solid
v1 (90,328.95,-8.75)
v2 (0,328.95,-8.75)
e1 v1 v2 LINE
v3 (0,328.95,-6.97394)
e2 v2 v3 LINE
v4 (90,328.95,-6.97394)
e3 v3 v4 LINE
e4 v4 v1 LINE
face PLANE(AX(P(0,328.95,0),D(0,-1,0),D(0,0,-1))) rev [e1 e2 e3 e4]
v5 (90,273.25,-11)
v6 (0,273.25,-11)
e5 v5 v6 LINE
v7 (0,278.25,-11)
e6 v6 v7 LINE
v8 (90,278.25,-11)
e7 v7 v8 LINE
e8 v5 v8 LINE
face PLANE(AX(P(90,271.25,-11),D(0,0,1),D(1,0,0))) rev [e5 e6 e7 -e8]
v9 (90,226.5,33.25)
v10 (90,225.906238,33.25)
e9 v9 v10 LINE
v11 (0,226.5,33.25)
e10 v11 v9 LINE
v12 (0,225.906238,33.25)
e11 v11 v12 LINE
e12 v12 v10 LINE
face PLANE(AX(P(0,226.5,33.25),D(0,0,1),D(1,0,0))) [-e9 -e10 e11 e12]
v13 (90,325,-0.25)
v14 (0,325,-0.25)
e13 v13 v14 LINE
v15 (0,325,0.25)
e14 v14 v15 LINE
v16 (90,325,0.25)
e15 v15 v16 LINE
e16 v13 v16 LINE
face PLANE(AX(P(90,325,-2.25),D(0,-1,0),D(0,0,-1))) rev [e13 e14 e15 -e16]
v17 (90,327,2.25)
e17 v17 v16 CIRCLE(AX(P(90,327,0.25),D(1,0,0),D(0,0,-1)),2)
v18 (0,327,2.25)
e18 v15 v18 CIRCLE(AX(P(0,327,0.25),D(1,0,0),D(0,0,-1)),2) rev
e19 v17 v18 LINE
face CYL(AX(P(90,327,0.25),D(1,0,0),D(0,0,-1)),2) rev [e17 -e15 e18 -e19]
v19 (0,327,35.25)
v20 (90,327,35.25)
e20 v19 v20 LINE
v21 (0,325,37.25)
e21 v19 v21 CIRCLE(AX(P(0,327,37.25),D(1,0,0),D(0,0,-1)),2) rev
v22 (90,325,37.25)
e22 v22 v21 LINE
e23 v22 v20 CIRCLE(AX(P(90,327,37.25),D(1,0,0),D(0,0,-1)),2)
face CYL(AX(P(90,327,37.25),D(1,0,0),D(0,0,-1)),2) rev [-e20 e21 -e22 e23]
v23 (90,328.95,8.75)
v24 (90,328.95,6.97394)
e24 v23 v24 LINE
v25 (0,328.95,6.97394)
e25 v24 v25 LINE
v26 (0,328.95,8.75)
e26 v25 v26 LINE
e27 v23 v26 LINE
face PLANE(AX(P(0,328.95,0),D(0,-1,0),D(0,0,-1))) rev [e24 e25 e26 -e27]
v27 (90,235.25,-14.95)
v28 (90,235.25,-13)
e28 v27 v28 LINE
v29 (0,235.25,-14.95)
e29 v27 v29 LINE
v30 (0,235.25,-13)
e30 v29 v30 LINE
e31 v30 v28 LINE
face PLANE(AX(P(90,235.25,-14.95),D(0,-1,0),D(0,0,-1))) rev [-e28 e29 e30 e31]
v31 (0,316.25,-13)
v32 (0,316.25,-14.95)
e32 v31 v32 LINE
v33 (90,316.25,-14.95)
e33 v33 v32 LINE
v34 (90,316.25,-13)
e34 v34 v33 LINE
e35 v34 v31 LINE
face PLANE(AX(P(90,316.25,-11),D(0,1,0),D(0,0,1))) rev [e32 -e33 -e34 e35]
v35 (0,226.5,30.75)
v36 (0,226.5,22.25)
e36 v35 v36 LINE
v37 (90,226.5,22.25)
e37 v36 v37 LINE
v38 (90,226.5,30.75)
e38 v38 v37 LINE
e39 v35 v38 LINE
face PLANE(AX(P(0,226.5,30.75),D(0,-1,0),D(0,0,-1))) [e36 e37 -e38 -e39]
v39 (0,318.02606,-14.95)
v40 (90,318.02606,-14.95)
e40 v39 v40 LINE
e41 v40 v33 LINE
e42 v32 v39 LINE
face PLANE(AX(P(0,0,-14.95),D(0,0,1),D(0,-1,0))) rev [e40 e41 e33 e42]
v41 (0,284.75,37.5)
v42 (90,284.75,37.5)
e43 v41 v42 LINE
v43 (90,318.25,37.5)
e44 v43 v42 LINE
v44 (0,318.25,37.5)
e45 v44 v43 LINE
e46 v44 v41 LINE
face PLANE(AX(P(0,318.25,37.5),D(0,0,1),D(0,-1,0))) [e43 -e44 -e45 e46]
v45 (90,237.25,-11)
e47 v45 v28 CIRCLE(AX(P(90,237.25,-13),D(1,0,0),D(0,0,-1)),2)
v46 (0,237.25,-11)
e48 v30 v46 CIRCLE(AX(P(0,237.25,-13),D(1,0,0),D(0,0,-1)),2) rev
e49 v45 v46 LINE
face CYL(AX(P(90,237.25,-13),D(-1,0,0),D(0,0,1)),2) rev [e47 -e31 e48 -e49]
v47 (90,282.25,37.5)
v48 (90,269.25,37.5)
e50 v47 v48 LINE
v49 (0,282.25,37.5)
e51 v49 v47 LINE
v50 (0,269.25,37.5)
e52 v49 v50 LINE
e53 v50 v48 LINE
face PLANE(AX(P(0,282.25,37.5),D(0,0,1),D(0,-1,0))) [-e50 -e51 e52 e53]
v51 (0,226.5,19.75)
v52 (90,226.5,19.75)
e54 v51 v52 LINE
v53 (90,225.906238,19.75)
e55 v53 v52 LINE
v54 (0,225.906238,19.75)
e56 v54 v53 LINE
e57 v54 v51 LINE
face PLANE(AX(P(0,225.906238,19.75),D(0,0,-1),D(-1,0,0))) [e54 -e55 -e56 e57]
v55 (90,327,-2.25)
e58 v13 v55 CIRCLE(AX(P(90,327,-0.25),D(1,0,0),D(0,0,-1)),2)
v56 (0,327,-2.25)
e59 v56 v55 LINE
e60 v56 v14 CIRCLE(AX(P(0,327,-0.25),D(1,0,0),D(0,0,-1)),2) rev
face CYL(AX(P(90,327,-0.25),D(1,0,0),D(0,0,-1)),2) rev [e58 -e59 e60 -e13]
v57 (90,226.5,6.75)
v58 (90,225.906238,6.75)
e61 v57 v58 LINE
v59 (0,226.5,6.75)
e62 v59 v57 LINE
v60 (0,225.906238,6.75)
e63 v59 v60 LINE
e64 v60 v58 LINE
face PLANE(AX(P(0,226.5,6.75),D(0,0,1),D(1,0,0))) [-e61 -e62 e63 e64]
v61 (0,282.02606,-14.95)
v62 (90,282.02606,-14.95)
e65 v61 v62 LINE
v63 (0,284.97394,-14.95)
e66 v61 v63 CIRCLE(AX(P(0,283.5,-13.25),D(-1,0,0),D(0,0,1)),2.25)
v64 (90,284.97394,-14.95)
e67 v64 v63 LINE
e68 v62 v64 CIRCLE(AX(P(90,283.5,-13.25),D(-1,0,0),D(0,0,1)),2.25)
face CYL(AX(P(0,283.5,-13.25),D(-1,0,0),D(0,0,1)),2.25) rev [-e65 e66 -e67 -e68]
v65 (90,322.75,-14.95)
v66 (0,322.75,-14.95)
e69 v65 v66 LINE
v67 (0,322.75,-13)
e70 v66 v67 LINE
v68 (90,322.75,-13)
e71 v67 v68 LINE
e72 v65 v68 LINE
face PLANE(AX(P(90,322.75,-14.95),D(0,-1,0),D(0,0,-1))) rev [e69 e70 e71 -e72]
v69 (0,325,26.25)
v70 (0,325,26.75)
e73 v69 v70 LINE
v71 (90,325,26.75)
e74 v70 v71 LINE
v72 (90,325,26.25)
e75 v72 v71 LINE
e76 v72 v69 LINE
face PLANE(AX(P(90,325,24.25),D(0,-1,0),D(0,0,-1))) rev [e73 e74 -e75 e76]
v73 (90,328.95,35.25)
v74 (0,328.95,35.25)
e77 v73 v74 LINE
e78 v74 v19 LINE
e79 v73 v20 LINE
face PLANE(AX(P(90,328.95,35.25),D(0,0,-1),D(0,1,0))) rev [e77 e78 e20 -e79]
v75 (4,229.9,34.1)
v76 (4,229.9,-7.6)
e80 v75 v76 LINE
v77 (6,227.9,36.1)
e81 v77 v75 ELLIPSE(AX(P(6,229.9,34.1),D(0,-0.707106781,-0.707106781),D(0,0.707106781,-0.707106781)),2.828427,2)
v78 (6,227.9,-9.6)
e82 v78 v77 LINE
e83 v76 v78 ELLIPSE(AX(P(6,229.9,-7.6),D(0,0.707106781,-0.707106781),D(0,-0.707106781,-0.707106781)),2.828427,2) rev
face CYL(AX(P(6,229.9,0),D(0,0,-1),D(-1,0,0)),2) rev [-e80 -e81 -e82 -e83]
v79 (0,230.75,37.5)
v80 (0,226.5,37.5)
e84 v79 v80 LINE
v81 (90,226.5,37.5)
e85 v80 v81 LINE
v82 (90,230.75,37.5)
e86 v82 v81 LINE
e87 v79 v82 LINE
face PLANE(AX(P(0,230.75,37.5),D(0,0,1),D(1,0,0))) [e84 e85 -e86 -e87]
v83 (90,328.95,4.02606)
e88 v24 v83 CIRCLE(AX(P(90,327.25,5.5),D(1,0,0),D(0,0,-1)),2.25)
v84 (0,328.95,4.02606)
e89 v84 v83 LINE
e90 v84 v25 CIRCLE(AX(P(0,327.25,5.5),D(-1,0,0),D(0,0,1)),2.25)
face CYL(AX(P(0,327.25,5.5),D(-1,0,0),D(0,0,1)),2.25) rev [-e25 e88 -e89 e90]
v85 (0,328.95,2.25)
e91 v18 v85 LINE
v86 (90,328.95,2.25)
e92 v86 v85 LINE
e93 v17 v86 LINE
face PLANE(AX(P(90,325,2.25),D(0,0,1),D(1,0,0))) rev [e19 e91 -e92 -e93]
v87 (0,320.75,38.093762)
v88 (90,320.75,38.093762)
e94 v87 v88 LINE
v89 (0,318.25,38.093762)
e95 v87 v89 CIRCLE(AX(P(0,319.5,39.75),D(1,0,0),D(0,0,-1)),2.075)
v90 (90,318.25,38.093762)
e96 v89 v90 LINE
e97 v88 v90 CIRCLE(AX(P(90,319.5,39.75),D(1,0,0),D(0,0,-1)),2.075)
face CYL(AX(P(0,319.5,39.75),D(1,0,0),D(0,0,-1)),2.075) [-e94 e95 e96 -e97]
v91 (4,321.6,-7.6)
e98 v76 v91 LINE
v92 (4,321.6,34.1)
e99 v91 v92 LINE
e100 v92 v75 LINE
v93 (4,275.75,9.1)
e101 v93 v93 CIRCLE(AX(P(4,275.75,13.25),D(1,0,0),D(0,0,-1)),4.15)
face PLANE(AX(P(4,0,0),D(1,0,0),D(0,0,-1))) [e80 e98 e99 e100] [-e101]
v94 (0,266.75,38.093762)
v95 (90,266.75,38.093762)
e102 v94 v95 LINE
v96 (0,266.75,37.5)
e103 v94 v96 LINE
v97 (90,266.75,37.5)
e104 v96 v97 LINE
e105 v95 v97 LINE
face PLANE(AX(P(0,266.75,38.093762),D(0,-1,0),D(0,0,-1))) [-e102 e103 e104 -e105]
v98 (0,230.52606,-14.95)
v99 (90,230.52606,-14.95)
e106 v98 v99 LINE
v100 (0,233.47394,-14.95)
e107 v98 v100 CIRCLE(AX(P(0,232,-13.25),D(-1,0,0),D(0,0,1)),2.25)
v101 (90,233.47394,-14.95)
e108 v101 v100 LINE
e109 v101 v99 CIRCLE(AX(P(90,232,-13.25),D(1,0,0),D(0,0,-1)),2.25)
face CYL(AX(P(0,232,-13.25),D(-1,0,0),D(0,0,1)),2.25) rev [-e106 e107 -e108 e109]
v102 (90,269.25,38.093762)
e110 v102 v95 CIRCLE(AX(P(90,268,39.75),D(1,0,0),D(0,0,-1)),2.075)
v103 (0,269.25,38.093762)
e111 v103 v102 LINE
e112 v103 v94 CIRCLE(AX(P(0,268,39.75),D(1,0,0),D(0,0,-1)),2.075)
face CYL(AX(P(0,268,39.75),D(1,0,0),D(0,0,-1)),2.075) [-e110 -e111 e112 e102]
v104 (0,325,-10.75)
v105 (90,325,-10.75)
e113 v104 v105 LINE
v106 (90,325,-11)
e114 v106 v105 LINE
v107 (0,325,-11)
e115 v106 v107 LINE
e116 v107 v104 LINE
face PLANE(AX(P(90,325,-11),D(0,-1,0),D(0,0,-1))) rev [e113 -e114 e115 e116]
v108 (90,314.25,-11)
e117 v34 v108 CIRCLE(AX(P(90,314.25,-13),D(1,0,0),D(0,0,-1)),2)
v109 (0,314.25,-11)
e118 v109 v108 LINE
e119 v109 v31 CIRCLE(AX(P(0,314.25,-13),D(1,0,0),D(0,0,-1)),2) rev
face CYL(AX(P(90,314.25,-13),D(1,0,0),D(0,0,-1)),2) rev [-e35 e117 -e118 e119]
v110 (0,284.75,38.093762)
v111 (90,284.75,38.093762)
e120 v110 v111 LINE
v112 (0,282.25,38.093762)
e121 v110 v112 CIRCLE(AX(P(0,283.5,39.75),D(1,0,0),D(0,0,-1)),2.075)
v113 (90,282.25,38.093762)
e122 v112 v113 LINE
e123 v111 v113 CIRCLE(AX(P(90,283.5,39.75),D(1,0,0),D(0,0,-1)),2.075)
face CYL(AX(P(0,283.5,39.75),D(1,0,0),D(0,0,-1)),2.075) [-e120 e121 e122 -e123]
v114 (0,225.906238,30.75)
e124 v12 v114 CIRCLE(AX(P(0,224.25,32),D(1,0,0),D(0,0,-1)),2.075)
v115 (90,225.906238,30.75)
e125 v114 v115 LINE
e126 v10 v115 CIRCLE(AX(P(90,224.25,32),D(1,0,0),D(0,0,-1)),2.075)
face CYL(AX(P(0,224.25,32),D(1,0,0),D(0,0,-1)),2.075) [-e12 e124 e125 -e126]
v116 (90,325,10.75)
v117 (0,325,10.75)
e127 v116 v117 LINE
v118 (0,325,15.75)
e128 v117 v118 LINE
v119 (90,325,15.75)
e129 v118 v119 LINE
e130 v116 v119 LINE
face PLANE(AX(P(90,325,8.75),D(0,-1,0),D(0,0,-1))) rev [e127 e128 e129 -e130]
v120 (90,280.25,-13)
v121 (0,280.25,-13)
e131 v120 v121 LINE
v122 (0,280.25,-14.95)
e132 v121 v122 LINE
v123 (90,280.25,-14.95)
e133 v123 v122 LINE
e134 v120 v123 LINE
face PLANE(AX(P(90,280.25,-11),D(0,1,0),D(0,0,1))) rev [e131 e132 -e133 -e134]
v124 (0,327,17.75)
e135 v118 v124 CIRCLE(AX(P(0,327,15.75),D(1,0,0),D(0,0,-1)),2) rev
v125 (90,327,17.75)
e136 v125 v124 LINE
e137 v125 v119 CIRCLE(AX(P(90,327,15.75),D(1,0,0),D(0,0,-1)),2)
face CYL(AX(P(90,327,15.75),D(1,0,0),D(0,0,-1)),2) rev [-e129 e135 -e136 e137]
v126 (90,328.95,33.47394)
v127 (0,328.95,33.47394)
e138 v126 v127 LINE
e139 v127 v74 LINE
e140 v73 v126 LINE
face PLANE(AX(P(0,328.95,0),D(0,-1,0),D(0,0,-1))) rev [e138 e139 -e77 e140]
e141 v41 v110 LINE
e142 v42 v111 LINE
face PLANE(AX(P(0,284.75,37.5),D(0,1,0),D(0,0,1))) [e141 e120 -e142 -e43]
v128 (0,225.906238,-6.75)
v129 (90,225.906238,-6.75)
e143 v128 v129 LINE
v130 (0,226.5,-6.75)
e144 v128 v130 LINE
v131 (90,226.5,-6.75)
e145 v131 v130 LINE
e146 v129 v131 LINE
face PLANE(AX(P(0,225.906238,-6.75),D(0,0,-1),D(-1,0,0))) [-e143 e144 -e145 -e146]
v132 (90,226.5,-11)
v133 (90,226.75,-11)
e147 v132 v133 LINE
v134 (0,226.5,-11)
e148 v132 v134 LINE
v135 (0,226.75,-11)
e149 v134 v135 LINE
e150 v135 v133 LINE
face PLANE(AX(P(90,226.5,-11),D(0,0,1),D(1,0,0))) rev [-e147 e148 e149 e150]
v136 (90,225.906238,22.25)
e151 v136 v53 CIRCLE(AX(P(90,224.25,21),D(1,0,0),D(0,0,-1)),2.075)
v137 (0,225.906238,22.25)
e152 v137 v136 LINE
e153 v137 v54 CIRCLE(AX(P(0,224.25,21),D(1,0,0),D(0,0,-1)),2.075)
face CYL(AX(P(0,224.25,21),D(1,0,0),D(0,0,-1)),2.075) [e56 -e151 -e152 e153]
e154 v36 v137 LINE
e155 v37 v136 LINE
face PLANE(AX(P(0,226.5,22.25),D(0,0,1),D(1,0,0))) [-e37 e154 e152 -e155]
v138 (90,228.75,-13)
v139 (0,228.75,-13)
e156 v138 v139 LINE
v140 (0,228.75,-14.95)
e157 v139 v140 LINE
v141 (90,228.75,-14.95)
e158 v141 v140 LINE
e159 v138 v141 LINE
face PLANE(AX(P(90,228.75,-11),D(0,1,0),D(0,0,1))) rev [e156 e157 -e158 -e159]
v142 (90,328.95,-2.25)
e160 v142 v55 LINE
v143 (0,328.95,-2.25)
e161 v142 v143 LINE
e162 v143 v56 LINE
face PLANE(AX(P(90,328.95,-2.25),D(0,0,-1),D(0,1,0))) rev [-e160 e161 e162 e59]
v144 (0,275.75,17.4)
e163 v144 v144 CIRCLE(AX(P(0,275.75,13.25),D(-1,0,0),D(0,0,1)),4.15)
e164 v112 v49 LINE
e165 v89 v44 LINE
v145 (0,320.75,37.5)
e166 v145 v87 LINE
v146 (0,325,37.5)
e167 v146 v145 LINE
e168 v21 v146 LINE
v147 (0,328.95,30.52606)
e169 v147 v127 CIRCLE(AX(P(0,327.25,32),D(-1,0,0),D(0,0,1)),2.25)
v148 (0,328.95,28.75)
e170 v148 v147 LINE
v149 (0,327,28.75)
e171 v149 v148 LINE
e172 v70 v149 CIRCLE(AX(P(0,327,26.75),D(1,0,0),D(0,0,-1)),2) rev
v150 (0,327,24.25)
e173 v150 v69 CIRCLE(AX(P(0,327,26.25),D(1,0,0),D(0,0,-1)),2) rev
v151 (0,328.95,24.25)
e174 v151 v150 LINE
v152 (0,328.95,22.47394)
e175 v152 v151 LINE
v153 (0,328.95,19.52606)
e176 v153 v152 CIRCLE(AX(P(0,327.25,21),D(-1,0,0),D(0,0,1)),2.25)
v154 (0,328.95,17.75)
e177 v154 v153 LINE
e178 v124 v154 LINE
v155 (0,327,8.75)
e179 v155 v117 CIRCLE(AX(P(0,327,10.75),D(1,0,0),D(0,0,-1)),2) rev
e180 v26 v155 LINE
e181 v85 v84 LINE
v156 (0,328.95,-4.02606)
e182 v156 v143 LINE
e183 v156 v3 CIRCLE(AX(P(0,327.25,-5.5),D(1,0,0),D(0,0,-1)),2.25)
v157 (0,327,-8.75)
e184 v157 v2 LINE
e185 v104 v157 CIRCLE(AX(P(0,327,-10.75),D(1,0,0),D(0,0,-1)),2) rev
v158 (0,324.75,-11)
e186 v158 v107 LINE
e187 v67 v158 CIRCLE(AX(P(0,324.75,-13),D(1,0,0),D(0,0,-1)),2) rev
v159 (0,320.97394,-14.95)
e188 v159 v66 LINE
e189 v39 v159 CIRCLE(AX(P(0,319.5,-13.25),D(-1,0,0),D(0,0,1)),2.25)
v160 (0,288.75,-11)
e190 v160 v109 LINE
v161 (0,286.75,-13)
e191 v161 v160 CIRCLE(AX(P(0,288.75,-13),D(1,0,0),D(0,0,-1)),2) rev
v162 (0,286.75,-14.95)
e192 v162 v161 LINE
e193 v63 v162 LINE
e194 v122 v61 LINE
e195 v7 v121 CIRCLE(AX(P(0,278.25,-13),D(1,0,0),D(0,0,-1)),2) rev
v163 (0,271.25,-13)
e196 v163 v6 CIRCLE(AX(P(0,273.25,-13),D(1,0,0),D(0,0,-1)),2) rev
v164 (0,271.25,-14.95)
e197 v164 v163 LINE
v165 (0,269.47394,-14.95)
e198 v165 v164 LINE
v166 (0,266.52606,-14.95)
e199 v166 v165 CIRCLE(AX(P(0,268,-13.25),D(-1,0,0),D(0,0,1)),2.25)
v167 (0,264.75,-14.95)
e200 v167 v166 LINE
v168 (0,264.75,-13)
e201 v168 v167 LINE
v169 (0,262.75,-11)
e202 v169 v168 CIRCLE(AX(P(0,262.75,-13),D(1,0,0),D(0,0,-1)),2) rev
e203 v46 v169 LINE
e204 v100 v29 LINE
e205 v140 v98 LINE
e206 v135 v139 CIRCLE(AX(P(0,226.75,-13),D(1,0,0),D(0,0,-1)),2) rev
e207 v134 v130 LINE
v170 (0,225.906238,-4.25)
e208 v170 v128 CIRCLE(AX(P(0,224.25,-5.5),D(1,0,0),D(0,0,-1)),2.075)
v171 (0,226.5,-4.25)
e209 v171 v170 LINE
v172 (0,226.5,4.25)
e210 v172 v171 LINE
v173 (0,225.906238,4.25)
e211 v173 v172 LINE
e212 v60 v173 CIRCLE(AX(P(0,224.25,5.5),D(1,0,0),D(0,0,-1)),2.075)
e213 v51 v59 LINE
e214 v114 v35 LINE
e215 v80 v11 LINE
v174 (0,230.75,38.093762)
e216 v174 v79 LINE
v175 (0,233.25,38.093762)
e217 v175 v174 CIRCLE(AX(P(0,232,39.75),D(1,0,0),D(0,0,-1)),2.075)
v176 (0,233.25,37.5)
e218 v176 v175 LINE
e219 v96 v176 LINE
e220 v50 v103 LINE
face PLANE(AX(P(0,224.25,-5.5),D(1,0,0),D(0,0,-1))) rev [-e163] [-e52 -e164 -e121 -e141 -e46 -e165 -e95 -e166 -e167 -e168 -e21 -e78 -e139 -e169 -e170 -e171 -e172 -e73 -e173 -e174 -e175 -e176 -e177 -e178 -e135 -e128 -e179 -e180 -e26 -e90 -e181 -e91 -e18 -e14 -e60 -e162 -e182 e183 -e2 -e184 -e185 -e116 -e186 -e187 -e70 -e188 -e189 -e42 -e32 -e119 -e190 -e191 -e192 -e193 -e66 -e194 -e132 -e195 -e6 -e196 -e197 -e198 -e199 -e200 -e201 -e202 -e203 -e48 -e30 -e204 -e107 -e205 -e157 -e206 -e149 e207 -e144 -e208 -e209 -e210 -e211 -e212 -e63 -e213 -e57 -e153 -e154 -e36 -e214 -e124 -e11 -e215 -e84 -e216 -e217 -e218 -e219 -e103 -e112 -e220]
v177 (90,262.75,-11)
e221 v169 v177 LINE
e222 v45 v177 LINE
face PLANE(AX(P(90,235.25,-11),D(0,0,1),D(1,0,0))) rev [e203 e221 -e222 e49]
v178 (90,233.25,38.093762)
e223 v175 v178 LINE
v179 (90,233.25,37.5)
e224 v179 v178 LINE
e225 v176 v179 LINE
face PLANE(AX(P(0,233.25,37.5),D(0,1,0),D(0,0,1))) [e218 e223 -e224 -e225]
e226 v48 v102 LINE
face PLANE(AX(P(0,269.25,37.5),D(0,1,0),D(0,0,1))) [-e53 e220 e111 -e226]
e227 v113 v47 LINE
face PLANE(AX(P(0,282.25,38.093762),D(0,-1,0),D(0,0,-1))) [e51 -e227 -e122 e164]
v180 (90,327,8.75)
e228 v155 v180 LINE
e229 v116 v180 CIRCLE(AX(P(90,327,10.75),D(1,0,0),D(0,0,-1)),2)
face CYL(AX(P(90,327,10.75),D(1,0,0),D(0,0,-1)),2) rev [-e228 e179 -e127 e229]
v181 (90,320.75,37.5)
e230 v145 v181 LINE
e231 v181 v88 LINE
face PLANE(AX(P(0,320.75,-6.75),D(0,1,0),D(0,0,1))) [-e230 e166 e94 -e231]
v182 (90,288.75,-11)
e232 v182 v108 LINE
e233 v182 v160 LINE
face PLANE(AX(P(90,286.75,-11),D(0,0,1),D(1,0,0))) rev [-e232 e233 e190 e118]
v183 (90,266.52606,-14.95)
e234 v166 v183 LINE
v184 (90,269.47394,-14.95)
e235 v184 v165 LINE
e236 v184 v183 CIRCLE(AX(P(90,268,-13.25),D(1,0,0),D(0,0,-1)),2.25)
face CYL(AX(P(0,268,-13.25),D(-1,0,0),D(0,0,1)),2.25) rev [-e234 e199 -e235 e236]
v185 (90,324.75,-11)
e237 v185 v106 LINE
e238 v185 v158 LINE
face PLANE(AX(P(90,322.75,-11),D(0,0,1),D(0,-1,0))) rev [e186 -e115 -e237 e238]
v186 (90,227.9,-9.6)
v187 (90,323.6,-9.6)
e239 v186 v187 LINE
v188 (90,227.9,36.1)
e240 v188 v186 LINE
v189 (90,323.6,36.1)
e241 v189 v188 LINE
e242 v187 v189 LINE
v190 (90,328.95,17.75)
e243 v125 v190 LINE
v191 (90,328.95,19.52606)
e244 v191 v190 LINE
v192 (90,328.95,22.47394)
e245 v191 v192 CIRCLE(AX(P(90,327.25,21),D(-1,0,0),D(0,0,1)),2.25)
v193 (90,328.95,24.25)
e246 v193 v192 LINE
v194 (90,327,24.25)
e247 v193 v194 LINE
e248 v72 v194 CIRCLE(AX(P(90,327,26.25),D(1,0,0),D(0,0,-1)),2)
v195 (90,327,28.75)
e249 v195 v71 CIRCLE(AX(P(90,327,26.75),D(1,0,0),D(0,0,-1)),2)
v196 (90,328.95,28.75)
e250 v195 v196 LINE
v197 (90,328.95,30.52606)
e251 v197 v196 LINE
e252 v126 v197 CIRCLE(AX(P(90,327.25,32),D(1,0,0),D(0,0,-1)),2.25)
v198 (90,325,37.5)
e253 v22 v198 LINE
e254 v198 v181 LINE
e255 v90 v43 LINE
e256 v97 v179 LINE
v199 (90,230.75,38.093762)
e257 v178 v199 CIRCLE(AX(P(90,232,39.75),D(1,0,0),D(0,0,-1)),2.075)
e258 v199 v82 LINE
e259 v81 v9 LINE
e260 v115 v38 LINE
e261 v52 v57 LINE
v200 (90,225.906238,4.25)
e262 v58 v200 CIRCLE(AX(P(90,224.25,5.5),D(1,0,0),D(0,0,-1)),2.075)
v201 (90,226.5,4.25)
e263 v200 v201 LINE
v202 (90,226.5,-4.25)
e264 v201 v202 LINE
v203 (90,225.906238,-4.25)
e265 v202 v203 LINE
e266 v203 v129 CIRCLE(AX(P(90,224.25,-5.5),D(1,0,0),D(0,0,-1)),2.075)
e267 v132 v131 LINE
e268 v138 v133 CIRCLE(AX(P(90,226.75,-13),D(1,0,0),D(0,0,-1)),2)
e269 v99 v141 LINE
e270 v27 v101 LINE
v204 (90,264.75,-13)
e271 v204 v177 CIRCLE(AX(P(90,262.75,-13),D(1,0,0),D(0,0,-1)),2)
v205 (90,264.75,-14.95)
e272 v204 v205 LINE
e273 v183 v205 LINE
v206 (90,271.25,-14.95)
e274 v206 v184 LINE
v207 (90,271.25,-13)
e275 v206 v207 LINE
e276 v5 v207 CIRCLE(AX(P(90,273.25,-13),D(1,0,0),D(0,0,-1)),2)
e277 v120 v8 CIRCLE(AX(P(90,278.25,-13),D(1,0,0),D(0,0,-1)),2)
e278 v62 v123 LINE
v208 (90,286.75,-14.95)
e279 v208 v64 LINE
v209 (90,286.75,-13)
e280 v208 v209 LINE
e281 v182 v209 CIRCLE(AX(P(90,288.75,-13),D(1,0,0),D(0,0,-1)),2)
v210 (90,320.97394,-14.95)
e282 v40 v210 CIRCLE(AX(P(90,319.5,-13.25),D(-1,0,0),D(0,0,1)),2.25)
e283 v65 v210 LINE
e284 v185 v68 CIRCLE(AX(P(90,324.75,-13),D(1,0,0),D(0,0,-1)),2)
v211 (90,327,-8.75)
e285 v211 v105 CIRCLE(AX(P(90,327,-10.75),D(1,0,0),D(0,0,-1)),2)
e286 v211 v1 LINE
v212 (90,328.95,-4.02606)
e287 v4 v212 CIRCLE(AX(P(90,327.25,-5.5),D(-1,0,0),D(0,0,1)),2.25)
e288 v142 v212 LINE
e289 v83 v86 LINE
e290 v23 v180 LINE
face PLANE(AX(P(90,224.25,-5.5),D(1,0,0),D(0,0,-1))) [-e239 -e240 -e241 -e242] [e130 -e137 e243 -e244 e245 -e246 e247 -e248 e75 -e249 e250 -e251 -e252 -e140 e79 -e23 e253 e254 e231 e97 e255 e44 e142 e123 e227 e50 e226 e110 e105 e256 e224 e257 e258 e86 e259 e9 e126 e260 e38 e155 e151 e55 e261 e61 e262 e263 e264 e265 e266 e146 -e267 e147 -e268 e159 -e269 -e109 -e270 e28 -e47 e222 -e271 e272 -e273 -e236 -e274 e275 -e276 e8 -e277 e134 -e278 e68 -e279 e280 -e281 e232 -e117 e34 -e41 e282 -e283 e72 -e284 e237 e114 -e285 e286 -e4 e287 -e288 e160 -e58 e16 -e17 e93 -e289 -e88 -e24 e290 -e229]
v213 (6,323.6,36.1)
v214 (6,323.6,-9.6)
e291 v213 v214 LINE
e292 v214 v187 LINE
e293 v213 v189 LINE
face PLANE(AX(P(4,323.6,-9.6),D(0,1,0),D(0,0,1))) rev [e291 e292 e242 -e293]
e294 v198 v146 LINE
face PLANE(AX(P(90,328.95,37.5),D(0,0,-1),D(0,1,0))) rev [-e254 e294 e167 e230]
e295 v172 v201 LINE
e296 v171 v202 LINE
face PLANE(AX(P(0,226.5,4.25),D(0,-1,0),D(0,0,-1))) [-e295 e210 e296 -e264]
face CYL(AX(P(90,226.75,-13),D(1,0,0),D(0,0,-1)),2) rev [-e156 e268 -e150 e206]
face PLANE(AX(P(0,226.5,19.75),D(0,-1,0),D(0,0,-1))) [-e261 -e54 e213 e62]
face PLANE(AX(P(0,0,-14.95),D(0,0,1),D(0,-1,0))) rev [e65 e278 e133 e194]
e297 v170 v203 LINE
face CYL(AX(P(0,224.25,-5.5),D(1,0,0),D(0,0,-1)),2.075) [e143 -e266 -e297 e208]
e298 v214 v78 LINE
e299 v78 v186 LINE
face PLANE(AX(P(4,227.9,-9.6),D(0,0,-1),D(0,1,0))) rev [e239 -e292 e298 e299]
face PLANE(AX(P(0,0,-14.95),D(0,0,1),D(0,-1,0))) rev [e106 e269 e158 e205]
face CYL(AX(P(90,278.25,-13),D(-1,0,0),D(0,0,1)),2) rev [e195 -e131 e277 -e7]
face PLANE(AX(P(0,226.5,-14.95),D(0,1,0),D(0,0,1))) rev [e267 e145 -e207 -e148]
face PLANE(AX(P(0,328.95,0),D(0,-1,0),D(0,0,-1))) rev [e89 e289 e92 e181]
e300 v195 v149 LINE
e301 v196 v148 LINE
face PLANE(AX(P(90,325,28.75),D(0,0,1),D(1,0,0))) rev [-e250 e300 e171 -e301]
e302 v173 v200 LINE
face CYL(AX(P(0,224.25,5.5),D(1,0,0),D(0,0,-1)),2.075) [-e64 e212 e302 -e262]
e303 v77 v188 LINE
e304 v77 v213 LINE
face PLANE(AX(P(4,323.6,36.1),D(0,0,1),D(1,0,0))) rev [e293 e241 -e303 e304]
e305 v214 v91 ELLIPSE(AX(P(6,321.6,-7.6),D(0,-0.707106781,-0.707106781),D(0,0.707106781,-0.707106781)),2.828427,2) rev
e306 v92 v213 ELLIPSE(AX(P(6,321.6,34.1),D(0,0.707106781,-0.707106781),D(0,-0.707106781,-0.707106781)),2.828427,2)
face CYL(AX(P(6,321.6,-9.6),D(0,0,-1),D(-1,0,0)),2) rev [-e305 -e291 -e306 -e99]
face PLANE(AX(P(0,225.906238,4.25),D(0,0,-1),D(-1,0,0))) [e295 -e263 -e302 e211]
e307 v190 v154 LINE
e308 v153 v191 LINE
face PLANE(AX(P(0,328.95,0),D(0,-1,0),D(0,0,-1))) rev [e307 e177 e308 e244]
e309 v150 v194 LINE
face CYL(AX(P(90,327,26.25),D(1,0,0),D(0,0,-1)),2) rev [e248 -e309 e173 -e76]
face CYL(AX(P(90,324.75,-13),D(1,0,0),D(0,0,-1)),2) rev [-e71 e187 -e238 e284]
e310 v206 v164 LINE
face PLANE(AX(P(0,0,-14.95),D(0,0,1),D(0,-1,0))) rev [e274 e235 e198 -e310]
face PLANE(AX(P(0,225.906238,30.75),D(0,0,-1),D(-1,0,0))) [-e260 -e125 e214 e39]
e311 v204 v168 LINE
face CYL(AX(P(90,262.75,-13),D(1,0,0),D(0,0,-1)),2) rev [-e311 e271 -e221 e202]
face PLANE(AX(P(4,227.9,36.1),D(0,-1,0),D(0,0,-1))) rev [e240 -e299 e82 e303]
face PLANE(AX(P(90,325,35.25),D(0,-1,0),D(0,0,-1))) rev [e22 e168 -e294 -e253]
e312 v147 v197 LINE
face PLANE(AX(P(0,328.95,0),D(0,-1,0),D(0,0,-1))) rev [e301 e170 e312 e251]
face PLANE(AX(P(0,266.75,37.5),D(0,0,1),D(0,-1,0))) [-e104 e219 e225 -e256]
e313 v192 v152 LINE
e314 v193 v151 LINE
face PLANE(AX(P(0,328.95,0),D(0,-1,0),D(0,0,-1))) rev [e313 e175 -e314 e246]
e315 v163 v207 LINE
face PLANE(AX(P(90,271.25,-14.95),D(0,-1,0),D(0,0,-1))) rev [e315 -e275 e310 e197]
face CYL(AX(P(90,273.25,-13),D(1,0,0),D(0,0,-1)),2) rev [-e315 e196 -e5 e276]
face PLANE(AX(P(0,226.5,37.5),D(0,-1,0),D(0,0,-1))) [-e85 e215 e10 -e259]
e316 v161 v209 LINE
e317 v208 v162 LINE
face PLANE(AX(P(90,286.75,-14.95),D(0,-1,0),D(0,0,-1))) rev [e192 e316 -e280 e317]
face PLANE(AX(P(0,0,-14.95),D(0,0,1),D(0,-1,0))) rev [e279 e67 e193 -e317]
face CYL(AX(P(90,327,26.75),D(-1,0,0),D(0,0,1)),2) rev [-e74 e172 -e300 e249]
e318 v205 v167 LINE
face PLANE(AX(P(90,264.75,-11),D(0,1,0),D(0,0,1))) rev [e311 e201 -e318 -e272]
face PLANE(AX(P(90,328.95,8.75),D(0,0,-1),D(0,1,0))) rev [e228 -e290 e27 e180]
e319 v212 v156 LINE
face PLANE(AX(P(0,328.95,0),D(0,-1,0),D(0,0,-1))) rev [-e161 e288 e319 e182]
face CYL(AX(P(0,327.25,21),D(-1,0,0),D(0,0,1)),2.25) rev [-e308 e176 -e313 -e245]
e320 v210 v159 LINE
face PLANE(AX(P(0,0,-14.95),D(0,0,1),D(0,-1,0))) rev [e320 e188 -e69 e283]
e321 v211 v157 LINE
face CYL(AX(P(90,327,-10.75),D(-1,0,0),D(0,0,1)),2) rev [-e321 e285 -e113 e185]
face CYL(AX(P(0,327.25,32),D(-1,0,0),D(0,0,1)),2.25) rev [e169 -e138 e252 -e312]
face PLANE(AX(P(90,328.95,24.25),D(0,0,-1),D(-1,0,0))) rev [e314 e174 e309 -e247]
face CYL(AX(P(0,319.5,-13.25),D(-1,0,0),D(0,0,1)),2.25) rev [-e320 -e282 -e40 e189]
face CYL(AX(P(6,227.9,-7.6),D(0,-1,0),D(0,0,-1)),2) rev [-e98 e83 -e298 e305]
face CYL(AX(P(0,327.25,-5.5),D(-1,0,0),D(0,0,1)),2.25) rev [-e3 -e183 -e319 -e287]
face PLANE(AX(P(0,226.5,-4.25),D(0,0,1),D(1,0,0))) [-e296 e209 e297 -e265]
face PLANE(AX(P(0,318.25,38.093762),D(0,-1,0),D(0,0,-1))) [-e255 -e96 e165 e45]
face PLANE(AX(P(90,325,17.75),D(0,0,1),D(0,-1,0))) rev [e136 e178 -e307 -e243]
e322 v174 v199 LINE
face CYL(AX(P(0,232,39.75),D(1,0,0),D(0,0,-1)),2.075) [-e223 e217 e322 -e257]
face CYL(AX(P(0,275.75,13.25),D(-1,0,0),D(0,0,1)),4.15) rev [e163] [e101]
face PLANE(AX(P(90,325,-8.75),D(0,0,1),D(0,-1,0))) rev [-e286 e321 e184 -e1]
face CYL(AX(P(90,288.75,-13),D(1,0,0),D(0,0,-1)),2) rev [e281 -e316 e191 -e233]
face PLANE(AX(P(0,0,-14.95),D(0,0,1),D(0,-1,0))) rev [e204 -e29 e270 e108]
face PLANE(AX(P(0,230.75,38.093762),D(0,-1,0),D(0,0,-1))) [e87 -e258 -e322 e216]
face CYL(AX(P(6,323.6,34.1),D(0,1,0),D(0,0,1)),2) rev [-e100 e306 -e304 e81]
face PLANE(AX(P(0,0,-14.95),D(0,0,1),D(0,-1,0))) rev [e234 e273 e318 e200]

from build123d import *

# Parameters (mm, degrees)
EXTRUDE_1_DEPTH             = 90
SKETCH_2_W                  = 90
SKETCH_2_H                  = 44.25
EXTRUDE_2_DEPTH             = 8.2
SKETCH_3_W                  = 90
SKETCH_3_H                  = 102.45
EXTRUDE_3_DEPTH             = 8.2
SKETCH_4_W                  = 4.5
SKETCH_4_H                  = 3.95
CUT_EXTRUDE_1_DEPTH         = 344.594867722
SKETCH_5_W                  = 2.25
SKETCH_5_H                  = 3.95
CUT_EXTRUDE_2_DEPTH         = 344.594867722
SKETCH_6_W                  = 3.95
SKETCH_6_H                  = 2.25
CUT_EXTRUDE_3_DEPTH         = 344.594867722
SKETCH_7_W                  = 3.95
SKETCH_7_H                  = 29.5
CUT_EXTRUDE_4_DEPTH         = 344.594867722
SKETCH_8_W                  = 3.95
SKETCH_8_H                  = 9
CUT_EXTRUDE_5_DEPTH         = 344.594867722
SKETCH_9_W                  = 3.95
SKETCH_9_H                  = 29.5
CUT_EXTRUDE_6_DEPTH         = 344.594867722
SKETCH_10_W                 = 3.95
SKETCH_10_H                 = 6.2
CUT_EXTRUDE_7_DEPTH         = 344.594867722
SKETCH_11_W                 = 2.25
SKETCH_11_H                 = 3.95
CUT_EXTRUDE_8_DEPTH         = 344.594867722
SKETCH_12_W                 = 4.5
SKETCH_12_H                 = 3.95
CUT_EXTRUDE_9_DEPTH         = 344.594867722
SKETCH_13_W                 = 9
SKETCH_13_H                 = 3.95
CUT_EXTRUDE_10_DEPTH        = 344.594867722
SKETCH_14_W                 = 45.7
SKETCH_14_H                 = 95.7
CUT_EXTRUDE_11_DEPTH        = 86
HOLE_WIZARD_2_5_2_5_1_D     = 2.5
HOLE_WIZARD_4_5_4_5_1_D     = 4.5
HOLE_WIZARD_8_3_8_3_1_D     = 8.3
HOLE_WIZARD_8_3_8_3_1_DEPTH = 3.2
CUT_EXTRUDE_START           = -10
SKETCH_21_R                 = 4.15
CUT_EXTRUDE_12_DEPTH        = 10
SKETCH_22_R                 = 1.631577579
SKETCH_22_R_2               = 1.519375383
SKETCH_22_R_3               = 1.487580747
SKETCH_22_R_4               = 1.581735942
SKETCH_22_R_5               = 1.487835557
SKETCH_22_R_6               = 1.42600834
SKETCH_22_R_7               = 1.628129915
SKETCH_22_R_8               = 1.52367125
EXTRUDE_4_DEPTH             = 90
FILLET_1_R                  = 2
FILLET_2_R                  = 2
FILLET_3_R                  = 2
FILLET_4_R                  = 2
FILLET_5_R                  = 2
FILLET_6_R                  = 2
FILLET_7_R                  = 2
FILLET_8_R                  = 2
FILLET_9_R                  = 2
FILLET_10_R                 = 2
FILLET_11_R                 = 2
FILLET_12_R                 = 2
FILLET_13_R                 = 2
FILLET_14_R                 = 2
FILLET_15_R                 = 2
FILLET_16_R                 = 2
FILLET_17_R                 = 2
FILLET_18_R                 = 2
FILLET_19_R                 = 2
FILLET_20_R                 = 2


with BuildPart() as part:
    # Эскиз1 → Бобышка-Вытянуть1 (new body)
    with BuildSketch(Plane(origin=(90, 0, 0), x_dir=(0, 0, -1), z_dir=(1, 0, 0))):
        with BuildLine():
            Line((6.75, 225.906238208), (6.75, 320.75))
            Line((6.75, 320.75), (-38.093761792, 320.75))
            ThreePointArc((-38.093761792, 320.75), (-41.825, 319.5), (-38.093761792, 318.25))
            Line((-38.093761792, 318.25), (-37.5, 318.25))
            Line((-37.5, 318.25), (-37.5, 284.75))
            Line((-37.5, 284.75), (-38.093761792, 284.75))
            ThreePointArc((-38.093761792, 284.75), (-41.825, 283.5), (-38.093761792, 282.25))
            Line((-38.093761792, 282.25), (-37.5, 282.25))
            Line((-37.5, 282.25), (-37.5, 269.25))
            Line((-37.5, 269.25), (-38.093761792, 269.25))
            ThreePointArc((-38.093761792, 269.25), (-41.825, 268), (-38.093761792, 266.75))
            Line((-38.093761792, 266.75), (-37.5, 266.75))
            Line((-37.5, 266.75), (-37.5, 233.25))
            Line((-37.5, 233.25), (-38.093761792, 233.25))
            ThreePointArc((-38.093761792, 233.25), (-41.825, 232), (-38.093761792, 230.75))
            Line((-38.093761792, 230.75), (-37.5, 230.75))
            Line((-37.5, 230.75), (-37.5, 226.5))
            Line((-37.5, 226.5), (-33.25, 226.5))
            Line((-33.25, 226.5), (-33.25, 225.906238208))
            ThreePointArc((-33.25, 225.906238208), (-32, 222.175), (-30.75, 225.906238208))
            Line((-30.75, 225.906238208), (-30.75, 226.5))
            Line((-30.75, 226.5), (-22.25, 226.5))
            Line((-22.25, 226.5), (-22.25, 225.906238208))
            ThreePointArc((-22.25, 225.906238208), (-21, 222.175), (-19.75, 225.906238208))
            Line((-19.75, 225.906238208), (-19.75, 226.5))
            Line((-19.75, 226.5), (-6.75, 226.5))
            Line((-6.75, 226.5), (-6.75, 225.906238208))
            ThreePointArc((-6.75, 225.906238208), (-5.5, 222.175), (-4.25, 225.906238208))
            Line((-4.25, 225.906238208), (-4.25, 226.5))
            Line((-4.25, 226.5), (4.25, 226.5))
            Line((4.25, 226.5), (4.25, 225.906238208))
            ThreePointArc((4.25, 225.906238208), (5.5, 222.175), (6.75, 225.906238208))
        make_face()
    extrude(amount=-EXTRUDE_1_DEPTH)

    # Эскиз2 → Бобышка-Вытянуть2 (add)
    with BuildSketch(Plane(origin=(0, 320.75, 0), x_dir=(-1, 0, 0), z_dir=(0, 1, 0))):
        with Locations((-45, 15.375)):
            Rectangle(SKETCH_2_W, SKETCH_2_H)
    extrude(amount=EXTRUDE_2_DEPTH)

    # Эскиз3 → Бобышка-Вытянуть3 (add)
    with BuildSketch(Plane(origin=(0, 0, -6.75), x_dir=(-1, 0, 0), z_dir=(0, 0, -1))):
        with Locations((-45, 277.725)):
            Rectangle(SKETCH_3_W, SKETCH_3_H)
    extrude(amount=EXTRUDE_3_DEPTH)

    # Эскиз4 → Вырез-Вытянуть1 (cut, through all)
    with BuildSketch(Plane.ZY):
        with Locations((26.5, 326.975)):
            Rectangle(SKETCH_4_W, SKETCH_4_H)
    extrude(amount=-CUT_EXTRUDE_1_DEPTH, mode=Mode.SUBTRACT)

    # Эскиз5 → Вырез-Вытянуть2 (cut, through all)
    with BuildSketch(Plane.ZY):
        with Locations((36.375, 326.975)):
            Rectangle(SKETCH_5_W, SKETCH_5_H)
    extrude(amount=-CUT_EXTRUDE_2_DEPTH, mode=Mode.SUBTRACT)

    # Эскиз6 → Вырез-Вытянуть3 (cut, through all)
    with BuildSketch(Plane.ZY):
        with Locations((-12.975, 227.625)):
            Rectangle(SKETCH_6_W, SKETCH_6_H)
    extrude(amount=-CUT_EXTRUDE_3_DEPTH, mode=Mode.SUBTRACT)

    # Эскиз7 → Вырез-Вытянуть4 (cut, through all)
    with BuildSketch(Plane.ZY):
        with Locations((-12.975, 250)):
            Rectangle(SKETCH_7_W, SKETCH_7_H)
    extrude(amount=-CUT_EXTRUDE_4_DEPTH, mode=Mode.SUBTRACT)

    # Эскиз8 → Вырез-Вытянуть5 (cut, through all)
    with BuildSketch(Plane.ZY):
        with Locations((-12.975, 275.75)):
            Rectangle(SKETCH_8_W, SKETCH_8_H)
    extrude(amount=-CUT_EXTRUDE_5_DEPTH, mode=Mode.SUBTRACT)

    # Эскиз9 → Вырез-Вытянуть6 (cut, through all)
    with BuildSketch(Plane.ZY):
        with Locations((-12.975, 301.5)):
            Rectangle(SKETCH_9_W, SKETCH_9_H)
    extrude(amount=-CUT_EXTRUDE_6_DEPTH, mode=Mode.SUBTRACT)

    # Эскиз10 → Вырез-Вытянуть7 (cut, through all)
    with BuildSketch(Plane.ZY):
        with Locations((-12.975, 325.85)):
            Rectangle(SKETCH_10_W, SKETCH_10_H)
    extrude(amount=-CUT_EXTRUDE_7_DEPTH, mode=Mode.SUBTRACT)

    # Эскиз11 → Вырез-Вытянуть8 (cut, through all)
    with BuildSketch(Plane.ZY):
        with Locations((-9.875, 326.975)):
            Rectangle(SKETCH_11_W, SKETCH_11_H)
    extrude(amount=-CUT_EXTRUDE_8_DEPTH, mode=Mode.SUBTRACT)

    # Эскиз12 → Вырез-Вытянуть9 (cut, through all)
    with BuildSketch(Plane.ZY):
        with Locations((0, 326.975)):
            Rectangle(SKETCH_12_W, SKETCH_12_H)
    extrude(amount=-CUT_EXTRUDE_9_DEPTH, mode=Mode.SUBTRACT)

    # Эскиз13 → Вырез-Вытянуть10 (cut, through all)
    with BuildSketch(Plane.ZY):
        with Locations((13.25, 326.975)):
            Rectangle(SKETCH_13_W, SKETCH_13_H)
    extrude(amount=-CUT_EXTRUDE_10_DEPTH, mode=Mode.SUBTRACT)

    # Эскиз14 → Вырез-Вытянуть11 (cut)
    with BuildSketch(Plane(origin=(90, 0, 0), x_dir=(0, 0, -1), z_dir=(1, 0, 0))):
        with Locations((-13.25, 275.75)):
            Rectangle(SKETCH_14_W, SKETCH_14_H)
    extrude(amount=-CUT_EXTRUDE_11_DEPTH, mode=Mode.SUBTRACT)

    # Диаметр отверстия Ø2.5 (2.5)1 (through all)
    with Locations(Plane(origin=(90, 0, 0), x_dir=(0, 0, -1), z_dir=(1, 0, 0))):
        with Locations((-39.75, 232), (-21, 224.25), (-39.75, 283.5), (-5.5, 224.25), (5.5, 224.25), (-39.75, 319.5), (-39.75, 268), (-32, 224.25)):
            Hole(HOLE_WIZARD_2_5_2_5_1_D / 2)

    # Диаметр отверстия Ø4.5 (4.5)1 (through all)
    with Locations(Plane.ZY):
        with Locations((21, 327.25), (32, 327.25), (-13.25, 232), (-13.25, 268), (-13.25, 283.5), (-13.25, 319.5), (-5.5, 327.25), (5.5, 327.25)):
            Hole(HOLE_WIZARD_4_5_4_5_1_D / 2)

    # Диаметр отверстия Ø8.3 (8.3)1
    with Locations(Plane.ZY):
        with Locations((13.25, 275.75)):
            Hole(HOLE_WIZARD_8_3_8_3_1_D / 2, depth=HOLE_WIZARD_8_3_8_3_1_DEPTH)

    # Эскиз21 → Вырез-Вытянуть12 (cut)
    with BuildSketch(Plane.ZY.offset(CUT_EXTRUDE_START)):
        with Locations((13.25, 275.75)):
            Circle(SKETCH_21_R)
    extrude(amount=CUT_EXTRUDE_12_DEPTH, mode=Mode.SUBTRACT)

    # Эскиз22 → Бобышка-Вытянуть4 (add)
    with BuildSketch(Plane(origin=(90, 0, 0), x_dir=(0, 0, -1), z_dir=(1, 0, 0))):
        with Locations((-39.75, 319.5)):
            Circle(SKETCH_22_R)
        with Locations((-39.75, 283.5)):
            Circle(SKETCH_22_R_2)
        with Locations((-39.75, 268)):
            Circle(SKETCH_22_R_3)
        with Locations((-39.75, 232)):
            Circle(SKETCH_22_R_4)
        with Locations((-32, 224.25)):
            Circle(SKETCH_22_R_5)
        with Locations((-21, 224.25)):
            Circle(SKETCH_22_R_6)
        with Locations((-5.5, 224.25)):
            Circle(SKETCH_22_R_7)
        with Locations((5.5, 224.25)):
            Circle(SKETCH_22_R_8)
    extrude(amount=-EXTRUDE_4_DEPTH)

    # Скругление1
    fillet_1_edges = [part.edges().sort_by_distance(p)[0] for p in [
        (4, 275.75, -9.6),
    ]]
    fillet(fillet_1_edges, radius=FILLET_1_R)

    # Скругление2
    fillet_2_edges = [part.edges().sort_by_distance(p)[0] for p in [
        (4, 275.75, 36.1),
    ]]
    fillet(fillet_2_edges, radius=FILLET_2_R)

    # Скругление3
    # the kernel refuses this fillet: 2 mm, written as the material it adds along each edge
    with BuildSketch(Plane(origin=(4, 323.6, -12.6), x_dir=(1, 0, 0), z_dir=(0, 0, 1))) as fillet_3_piece_1_section:
        with BuildLine():
            CenterArc((FILLET_3_R, -FILLET_3_R), FILLET_3_R, 90, 90)
            Line((0, -FILLET_3_R), (0, 0))
            Line((0, 0), (FILLET_3_R, 0))
        make_face()
    fillet_3_piece_1 = extrude(amount=51.7, mode=Mode.PRIVATE)
    fillet_3_piece_1 = split(fillet_3_piece_1, bisect_by=Plane(origin=(4.637124426, 323.319344088, -11), z_dir=(0, 0, 1)), keep=Keep.TOP, mode=Mode.PRIVATE)
    fillet_3_piece_1 = split(fillet_3_piece_1, bisect_by=Plane(origin=(4.637124426, 323.319344088, 37.5), z_dir=(0, 0, -1)), keep=Keep.TOP, mode=Mode.PRIVATE)
    add(fillet_3_piece_1)

    # Скругление4
    # the kernel refuses this fillet: 2 mm, written as the material it adds along each edge
    with BuildSketch(Plane(origin=(4, 227.9, 39.1), x_dir=(0, 1, 0), z_dir=(0, 0, -1))) as fillet_4_piece_1_section:
        with BuildLine():
            CenterArc((FILLET_4_R, FILLET_4_R), FILLET_4_R, 180, 90)
            Line((0, FILLET_4_R), (0, 0))
            Line((0, 0), (FILLET_4_R, 0))
        make_face()
    fillet_4_piece_1 = extrude(amount=51.7, mode=Mode.PRIVATE)
    fillet_4_piece_1 = split(fillet_4_piece_1, bisect_by=Plane(origin=(4.14263726, 228.974904064, -11), z_dir=(0, 0, 1)), keep=Keep.TOP, mode=Mode.PRIVATE)
    fillet_4_piece_1 = split(fillet_4_piece_1, bisect_by=Plane(origin=(4.14263726, 228.974904064, 37.5), z_dir=(0, 0, -1)), keep=Keep.TOP, mode=Mode.PRIVATE)
    add(fillet_4_piece_1)

    # Скругление5
    fillet_5_edges = [part.edges().sort_by_distance(p)[0] for p in [
        (45, 325, 35.25),
    ]]
    fillet(fillet_5_edges, radius=FILLET_5_R)

    # Скругление6
    fillet_6_edges = [part.edges().sort_by_distance(p)[0] for p in [
        (45, 325, 28.75),
    ]]
    fillet(fillet_6_edges, radius=FILLET_6_R)

    # Скругление7
    fillet_7_edges = [part.edges().sort_by_distance(p)[0] for p in [
        (45, 325, 24.25),
    ]]
    fillet(fillet_7_edges, radius=FILLET_7_R)

    # Скругление8
    fillet_8_edges = [part.edges().sort_by_distance(p)[0] for p in [
        (45, 325, 17.75),
    ]]
    fillet(fillet_8_edges, radius=FILLET_8_R)

    # Скругление9
    fillet_9_edges = [part.edges().sort_by_distance(p)[0] for p in [
        (45, 325, 8.75),
    ]]
    fillet(fillet_9_edges, radius=FILLET_9_R)

    # Скругление10
    fillet_10_edges = [part.edges().sort_by_distance(p)[0] for p in [
        (45, 325, 2.25),
    ]]
    fillet(fillet_10_edges, radius=FILLET_10_R)

    # Скругление11
    fillet_11_edges = [part.edges().sort_by_distance(p)[0] for p in [
        (45, 325, -2.25),
    ]]
    fillet(fillet_11_edges, radius=FILLET_11_R)

    # Скругление12
    fillet_12_edges = [part.edges().sort_by_distance(p)[0] for p in [
        (45, 325, -8.75),
    ]]
    fillet(fillet_12_edges, radius=FILLET_12_R)

    # Скругление13
    fillet_13_edges = [part.edges().sort_by_distance(p)[0] for p in [
        (45, 322.75, -11),
    ]]
    fillet(fillet_13_edges, radius=FILLET_13_R)

    # Скругление14
    fillet_14_edges = [part.edges().sort_by_distance(p)[0] for p in [
        (45, 316.25, -11),
    ]]
    fillet(fillet_14_edges, radius=FILLET_14_R)

    # Скругление15
    fillet_15_edges = [part.edges().sort_by_distance(p)[0] for p in [
        (45, 286.75, -11),
    ]]
    fillet(fillet_15_edges, radius=FILLET_15_R)

    # Скругление16
    fillet_16_edges = [part.edges().sort_by_distance(p)[0] for p in [
        (45, 280.25, -11),
    ]]
    fillet(fillet_16_edges, radius=FILLET_16_R)

    # Скругление17
    fillet_17_edges = [part.edges().sort_by_distance(p)[0] for p in [
        (45, 271.25, -11),
    ]]
    fillet(fillet_17_edges, radius=FILLET_17_R)

    # Скругление18
    fillet_18_edges = [part.edges().sort_by_distance(p)[0] for p in [
        (45, 264.75, -11),
    ]]
    fillet(fillet_18_edges, radius=FILLET_18_R)

    # Скругление19
    fillet_19_edges = [part.edges().sort_by_distance(p)[0] for p in [
        (45, 235.25, -11),
    ]]
    fillet(fillet_19_edges, radius=FILLET_19_R)

    # Скругление20
    fillet_20_edges = [part.edges().sort_by_distance(p)[0] for p in [
        (45, 228.75, -11),
    ]]
    fillet(fillet_20_edges, radius=FILLET_20_R)


solid = part.part
